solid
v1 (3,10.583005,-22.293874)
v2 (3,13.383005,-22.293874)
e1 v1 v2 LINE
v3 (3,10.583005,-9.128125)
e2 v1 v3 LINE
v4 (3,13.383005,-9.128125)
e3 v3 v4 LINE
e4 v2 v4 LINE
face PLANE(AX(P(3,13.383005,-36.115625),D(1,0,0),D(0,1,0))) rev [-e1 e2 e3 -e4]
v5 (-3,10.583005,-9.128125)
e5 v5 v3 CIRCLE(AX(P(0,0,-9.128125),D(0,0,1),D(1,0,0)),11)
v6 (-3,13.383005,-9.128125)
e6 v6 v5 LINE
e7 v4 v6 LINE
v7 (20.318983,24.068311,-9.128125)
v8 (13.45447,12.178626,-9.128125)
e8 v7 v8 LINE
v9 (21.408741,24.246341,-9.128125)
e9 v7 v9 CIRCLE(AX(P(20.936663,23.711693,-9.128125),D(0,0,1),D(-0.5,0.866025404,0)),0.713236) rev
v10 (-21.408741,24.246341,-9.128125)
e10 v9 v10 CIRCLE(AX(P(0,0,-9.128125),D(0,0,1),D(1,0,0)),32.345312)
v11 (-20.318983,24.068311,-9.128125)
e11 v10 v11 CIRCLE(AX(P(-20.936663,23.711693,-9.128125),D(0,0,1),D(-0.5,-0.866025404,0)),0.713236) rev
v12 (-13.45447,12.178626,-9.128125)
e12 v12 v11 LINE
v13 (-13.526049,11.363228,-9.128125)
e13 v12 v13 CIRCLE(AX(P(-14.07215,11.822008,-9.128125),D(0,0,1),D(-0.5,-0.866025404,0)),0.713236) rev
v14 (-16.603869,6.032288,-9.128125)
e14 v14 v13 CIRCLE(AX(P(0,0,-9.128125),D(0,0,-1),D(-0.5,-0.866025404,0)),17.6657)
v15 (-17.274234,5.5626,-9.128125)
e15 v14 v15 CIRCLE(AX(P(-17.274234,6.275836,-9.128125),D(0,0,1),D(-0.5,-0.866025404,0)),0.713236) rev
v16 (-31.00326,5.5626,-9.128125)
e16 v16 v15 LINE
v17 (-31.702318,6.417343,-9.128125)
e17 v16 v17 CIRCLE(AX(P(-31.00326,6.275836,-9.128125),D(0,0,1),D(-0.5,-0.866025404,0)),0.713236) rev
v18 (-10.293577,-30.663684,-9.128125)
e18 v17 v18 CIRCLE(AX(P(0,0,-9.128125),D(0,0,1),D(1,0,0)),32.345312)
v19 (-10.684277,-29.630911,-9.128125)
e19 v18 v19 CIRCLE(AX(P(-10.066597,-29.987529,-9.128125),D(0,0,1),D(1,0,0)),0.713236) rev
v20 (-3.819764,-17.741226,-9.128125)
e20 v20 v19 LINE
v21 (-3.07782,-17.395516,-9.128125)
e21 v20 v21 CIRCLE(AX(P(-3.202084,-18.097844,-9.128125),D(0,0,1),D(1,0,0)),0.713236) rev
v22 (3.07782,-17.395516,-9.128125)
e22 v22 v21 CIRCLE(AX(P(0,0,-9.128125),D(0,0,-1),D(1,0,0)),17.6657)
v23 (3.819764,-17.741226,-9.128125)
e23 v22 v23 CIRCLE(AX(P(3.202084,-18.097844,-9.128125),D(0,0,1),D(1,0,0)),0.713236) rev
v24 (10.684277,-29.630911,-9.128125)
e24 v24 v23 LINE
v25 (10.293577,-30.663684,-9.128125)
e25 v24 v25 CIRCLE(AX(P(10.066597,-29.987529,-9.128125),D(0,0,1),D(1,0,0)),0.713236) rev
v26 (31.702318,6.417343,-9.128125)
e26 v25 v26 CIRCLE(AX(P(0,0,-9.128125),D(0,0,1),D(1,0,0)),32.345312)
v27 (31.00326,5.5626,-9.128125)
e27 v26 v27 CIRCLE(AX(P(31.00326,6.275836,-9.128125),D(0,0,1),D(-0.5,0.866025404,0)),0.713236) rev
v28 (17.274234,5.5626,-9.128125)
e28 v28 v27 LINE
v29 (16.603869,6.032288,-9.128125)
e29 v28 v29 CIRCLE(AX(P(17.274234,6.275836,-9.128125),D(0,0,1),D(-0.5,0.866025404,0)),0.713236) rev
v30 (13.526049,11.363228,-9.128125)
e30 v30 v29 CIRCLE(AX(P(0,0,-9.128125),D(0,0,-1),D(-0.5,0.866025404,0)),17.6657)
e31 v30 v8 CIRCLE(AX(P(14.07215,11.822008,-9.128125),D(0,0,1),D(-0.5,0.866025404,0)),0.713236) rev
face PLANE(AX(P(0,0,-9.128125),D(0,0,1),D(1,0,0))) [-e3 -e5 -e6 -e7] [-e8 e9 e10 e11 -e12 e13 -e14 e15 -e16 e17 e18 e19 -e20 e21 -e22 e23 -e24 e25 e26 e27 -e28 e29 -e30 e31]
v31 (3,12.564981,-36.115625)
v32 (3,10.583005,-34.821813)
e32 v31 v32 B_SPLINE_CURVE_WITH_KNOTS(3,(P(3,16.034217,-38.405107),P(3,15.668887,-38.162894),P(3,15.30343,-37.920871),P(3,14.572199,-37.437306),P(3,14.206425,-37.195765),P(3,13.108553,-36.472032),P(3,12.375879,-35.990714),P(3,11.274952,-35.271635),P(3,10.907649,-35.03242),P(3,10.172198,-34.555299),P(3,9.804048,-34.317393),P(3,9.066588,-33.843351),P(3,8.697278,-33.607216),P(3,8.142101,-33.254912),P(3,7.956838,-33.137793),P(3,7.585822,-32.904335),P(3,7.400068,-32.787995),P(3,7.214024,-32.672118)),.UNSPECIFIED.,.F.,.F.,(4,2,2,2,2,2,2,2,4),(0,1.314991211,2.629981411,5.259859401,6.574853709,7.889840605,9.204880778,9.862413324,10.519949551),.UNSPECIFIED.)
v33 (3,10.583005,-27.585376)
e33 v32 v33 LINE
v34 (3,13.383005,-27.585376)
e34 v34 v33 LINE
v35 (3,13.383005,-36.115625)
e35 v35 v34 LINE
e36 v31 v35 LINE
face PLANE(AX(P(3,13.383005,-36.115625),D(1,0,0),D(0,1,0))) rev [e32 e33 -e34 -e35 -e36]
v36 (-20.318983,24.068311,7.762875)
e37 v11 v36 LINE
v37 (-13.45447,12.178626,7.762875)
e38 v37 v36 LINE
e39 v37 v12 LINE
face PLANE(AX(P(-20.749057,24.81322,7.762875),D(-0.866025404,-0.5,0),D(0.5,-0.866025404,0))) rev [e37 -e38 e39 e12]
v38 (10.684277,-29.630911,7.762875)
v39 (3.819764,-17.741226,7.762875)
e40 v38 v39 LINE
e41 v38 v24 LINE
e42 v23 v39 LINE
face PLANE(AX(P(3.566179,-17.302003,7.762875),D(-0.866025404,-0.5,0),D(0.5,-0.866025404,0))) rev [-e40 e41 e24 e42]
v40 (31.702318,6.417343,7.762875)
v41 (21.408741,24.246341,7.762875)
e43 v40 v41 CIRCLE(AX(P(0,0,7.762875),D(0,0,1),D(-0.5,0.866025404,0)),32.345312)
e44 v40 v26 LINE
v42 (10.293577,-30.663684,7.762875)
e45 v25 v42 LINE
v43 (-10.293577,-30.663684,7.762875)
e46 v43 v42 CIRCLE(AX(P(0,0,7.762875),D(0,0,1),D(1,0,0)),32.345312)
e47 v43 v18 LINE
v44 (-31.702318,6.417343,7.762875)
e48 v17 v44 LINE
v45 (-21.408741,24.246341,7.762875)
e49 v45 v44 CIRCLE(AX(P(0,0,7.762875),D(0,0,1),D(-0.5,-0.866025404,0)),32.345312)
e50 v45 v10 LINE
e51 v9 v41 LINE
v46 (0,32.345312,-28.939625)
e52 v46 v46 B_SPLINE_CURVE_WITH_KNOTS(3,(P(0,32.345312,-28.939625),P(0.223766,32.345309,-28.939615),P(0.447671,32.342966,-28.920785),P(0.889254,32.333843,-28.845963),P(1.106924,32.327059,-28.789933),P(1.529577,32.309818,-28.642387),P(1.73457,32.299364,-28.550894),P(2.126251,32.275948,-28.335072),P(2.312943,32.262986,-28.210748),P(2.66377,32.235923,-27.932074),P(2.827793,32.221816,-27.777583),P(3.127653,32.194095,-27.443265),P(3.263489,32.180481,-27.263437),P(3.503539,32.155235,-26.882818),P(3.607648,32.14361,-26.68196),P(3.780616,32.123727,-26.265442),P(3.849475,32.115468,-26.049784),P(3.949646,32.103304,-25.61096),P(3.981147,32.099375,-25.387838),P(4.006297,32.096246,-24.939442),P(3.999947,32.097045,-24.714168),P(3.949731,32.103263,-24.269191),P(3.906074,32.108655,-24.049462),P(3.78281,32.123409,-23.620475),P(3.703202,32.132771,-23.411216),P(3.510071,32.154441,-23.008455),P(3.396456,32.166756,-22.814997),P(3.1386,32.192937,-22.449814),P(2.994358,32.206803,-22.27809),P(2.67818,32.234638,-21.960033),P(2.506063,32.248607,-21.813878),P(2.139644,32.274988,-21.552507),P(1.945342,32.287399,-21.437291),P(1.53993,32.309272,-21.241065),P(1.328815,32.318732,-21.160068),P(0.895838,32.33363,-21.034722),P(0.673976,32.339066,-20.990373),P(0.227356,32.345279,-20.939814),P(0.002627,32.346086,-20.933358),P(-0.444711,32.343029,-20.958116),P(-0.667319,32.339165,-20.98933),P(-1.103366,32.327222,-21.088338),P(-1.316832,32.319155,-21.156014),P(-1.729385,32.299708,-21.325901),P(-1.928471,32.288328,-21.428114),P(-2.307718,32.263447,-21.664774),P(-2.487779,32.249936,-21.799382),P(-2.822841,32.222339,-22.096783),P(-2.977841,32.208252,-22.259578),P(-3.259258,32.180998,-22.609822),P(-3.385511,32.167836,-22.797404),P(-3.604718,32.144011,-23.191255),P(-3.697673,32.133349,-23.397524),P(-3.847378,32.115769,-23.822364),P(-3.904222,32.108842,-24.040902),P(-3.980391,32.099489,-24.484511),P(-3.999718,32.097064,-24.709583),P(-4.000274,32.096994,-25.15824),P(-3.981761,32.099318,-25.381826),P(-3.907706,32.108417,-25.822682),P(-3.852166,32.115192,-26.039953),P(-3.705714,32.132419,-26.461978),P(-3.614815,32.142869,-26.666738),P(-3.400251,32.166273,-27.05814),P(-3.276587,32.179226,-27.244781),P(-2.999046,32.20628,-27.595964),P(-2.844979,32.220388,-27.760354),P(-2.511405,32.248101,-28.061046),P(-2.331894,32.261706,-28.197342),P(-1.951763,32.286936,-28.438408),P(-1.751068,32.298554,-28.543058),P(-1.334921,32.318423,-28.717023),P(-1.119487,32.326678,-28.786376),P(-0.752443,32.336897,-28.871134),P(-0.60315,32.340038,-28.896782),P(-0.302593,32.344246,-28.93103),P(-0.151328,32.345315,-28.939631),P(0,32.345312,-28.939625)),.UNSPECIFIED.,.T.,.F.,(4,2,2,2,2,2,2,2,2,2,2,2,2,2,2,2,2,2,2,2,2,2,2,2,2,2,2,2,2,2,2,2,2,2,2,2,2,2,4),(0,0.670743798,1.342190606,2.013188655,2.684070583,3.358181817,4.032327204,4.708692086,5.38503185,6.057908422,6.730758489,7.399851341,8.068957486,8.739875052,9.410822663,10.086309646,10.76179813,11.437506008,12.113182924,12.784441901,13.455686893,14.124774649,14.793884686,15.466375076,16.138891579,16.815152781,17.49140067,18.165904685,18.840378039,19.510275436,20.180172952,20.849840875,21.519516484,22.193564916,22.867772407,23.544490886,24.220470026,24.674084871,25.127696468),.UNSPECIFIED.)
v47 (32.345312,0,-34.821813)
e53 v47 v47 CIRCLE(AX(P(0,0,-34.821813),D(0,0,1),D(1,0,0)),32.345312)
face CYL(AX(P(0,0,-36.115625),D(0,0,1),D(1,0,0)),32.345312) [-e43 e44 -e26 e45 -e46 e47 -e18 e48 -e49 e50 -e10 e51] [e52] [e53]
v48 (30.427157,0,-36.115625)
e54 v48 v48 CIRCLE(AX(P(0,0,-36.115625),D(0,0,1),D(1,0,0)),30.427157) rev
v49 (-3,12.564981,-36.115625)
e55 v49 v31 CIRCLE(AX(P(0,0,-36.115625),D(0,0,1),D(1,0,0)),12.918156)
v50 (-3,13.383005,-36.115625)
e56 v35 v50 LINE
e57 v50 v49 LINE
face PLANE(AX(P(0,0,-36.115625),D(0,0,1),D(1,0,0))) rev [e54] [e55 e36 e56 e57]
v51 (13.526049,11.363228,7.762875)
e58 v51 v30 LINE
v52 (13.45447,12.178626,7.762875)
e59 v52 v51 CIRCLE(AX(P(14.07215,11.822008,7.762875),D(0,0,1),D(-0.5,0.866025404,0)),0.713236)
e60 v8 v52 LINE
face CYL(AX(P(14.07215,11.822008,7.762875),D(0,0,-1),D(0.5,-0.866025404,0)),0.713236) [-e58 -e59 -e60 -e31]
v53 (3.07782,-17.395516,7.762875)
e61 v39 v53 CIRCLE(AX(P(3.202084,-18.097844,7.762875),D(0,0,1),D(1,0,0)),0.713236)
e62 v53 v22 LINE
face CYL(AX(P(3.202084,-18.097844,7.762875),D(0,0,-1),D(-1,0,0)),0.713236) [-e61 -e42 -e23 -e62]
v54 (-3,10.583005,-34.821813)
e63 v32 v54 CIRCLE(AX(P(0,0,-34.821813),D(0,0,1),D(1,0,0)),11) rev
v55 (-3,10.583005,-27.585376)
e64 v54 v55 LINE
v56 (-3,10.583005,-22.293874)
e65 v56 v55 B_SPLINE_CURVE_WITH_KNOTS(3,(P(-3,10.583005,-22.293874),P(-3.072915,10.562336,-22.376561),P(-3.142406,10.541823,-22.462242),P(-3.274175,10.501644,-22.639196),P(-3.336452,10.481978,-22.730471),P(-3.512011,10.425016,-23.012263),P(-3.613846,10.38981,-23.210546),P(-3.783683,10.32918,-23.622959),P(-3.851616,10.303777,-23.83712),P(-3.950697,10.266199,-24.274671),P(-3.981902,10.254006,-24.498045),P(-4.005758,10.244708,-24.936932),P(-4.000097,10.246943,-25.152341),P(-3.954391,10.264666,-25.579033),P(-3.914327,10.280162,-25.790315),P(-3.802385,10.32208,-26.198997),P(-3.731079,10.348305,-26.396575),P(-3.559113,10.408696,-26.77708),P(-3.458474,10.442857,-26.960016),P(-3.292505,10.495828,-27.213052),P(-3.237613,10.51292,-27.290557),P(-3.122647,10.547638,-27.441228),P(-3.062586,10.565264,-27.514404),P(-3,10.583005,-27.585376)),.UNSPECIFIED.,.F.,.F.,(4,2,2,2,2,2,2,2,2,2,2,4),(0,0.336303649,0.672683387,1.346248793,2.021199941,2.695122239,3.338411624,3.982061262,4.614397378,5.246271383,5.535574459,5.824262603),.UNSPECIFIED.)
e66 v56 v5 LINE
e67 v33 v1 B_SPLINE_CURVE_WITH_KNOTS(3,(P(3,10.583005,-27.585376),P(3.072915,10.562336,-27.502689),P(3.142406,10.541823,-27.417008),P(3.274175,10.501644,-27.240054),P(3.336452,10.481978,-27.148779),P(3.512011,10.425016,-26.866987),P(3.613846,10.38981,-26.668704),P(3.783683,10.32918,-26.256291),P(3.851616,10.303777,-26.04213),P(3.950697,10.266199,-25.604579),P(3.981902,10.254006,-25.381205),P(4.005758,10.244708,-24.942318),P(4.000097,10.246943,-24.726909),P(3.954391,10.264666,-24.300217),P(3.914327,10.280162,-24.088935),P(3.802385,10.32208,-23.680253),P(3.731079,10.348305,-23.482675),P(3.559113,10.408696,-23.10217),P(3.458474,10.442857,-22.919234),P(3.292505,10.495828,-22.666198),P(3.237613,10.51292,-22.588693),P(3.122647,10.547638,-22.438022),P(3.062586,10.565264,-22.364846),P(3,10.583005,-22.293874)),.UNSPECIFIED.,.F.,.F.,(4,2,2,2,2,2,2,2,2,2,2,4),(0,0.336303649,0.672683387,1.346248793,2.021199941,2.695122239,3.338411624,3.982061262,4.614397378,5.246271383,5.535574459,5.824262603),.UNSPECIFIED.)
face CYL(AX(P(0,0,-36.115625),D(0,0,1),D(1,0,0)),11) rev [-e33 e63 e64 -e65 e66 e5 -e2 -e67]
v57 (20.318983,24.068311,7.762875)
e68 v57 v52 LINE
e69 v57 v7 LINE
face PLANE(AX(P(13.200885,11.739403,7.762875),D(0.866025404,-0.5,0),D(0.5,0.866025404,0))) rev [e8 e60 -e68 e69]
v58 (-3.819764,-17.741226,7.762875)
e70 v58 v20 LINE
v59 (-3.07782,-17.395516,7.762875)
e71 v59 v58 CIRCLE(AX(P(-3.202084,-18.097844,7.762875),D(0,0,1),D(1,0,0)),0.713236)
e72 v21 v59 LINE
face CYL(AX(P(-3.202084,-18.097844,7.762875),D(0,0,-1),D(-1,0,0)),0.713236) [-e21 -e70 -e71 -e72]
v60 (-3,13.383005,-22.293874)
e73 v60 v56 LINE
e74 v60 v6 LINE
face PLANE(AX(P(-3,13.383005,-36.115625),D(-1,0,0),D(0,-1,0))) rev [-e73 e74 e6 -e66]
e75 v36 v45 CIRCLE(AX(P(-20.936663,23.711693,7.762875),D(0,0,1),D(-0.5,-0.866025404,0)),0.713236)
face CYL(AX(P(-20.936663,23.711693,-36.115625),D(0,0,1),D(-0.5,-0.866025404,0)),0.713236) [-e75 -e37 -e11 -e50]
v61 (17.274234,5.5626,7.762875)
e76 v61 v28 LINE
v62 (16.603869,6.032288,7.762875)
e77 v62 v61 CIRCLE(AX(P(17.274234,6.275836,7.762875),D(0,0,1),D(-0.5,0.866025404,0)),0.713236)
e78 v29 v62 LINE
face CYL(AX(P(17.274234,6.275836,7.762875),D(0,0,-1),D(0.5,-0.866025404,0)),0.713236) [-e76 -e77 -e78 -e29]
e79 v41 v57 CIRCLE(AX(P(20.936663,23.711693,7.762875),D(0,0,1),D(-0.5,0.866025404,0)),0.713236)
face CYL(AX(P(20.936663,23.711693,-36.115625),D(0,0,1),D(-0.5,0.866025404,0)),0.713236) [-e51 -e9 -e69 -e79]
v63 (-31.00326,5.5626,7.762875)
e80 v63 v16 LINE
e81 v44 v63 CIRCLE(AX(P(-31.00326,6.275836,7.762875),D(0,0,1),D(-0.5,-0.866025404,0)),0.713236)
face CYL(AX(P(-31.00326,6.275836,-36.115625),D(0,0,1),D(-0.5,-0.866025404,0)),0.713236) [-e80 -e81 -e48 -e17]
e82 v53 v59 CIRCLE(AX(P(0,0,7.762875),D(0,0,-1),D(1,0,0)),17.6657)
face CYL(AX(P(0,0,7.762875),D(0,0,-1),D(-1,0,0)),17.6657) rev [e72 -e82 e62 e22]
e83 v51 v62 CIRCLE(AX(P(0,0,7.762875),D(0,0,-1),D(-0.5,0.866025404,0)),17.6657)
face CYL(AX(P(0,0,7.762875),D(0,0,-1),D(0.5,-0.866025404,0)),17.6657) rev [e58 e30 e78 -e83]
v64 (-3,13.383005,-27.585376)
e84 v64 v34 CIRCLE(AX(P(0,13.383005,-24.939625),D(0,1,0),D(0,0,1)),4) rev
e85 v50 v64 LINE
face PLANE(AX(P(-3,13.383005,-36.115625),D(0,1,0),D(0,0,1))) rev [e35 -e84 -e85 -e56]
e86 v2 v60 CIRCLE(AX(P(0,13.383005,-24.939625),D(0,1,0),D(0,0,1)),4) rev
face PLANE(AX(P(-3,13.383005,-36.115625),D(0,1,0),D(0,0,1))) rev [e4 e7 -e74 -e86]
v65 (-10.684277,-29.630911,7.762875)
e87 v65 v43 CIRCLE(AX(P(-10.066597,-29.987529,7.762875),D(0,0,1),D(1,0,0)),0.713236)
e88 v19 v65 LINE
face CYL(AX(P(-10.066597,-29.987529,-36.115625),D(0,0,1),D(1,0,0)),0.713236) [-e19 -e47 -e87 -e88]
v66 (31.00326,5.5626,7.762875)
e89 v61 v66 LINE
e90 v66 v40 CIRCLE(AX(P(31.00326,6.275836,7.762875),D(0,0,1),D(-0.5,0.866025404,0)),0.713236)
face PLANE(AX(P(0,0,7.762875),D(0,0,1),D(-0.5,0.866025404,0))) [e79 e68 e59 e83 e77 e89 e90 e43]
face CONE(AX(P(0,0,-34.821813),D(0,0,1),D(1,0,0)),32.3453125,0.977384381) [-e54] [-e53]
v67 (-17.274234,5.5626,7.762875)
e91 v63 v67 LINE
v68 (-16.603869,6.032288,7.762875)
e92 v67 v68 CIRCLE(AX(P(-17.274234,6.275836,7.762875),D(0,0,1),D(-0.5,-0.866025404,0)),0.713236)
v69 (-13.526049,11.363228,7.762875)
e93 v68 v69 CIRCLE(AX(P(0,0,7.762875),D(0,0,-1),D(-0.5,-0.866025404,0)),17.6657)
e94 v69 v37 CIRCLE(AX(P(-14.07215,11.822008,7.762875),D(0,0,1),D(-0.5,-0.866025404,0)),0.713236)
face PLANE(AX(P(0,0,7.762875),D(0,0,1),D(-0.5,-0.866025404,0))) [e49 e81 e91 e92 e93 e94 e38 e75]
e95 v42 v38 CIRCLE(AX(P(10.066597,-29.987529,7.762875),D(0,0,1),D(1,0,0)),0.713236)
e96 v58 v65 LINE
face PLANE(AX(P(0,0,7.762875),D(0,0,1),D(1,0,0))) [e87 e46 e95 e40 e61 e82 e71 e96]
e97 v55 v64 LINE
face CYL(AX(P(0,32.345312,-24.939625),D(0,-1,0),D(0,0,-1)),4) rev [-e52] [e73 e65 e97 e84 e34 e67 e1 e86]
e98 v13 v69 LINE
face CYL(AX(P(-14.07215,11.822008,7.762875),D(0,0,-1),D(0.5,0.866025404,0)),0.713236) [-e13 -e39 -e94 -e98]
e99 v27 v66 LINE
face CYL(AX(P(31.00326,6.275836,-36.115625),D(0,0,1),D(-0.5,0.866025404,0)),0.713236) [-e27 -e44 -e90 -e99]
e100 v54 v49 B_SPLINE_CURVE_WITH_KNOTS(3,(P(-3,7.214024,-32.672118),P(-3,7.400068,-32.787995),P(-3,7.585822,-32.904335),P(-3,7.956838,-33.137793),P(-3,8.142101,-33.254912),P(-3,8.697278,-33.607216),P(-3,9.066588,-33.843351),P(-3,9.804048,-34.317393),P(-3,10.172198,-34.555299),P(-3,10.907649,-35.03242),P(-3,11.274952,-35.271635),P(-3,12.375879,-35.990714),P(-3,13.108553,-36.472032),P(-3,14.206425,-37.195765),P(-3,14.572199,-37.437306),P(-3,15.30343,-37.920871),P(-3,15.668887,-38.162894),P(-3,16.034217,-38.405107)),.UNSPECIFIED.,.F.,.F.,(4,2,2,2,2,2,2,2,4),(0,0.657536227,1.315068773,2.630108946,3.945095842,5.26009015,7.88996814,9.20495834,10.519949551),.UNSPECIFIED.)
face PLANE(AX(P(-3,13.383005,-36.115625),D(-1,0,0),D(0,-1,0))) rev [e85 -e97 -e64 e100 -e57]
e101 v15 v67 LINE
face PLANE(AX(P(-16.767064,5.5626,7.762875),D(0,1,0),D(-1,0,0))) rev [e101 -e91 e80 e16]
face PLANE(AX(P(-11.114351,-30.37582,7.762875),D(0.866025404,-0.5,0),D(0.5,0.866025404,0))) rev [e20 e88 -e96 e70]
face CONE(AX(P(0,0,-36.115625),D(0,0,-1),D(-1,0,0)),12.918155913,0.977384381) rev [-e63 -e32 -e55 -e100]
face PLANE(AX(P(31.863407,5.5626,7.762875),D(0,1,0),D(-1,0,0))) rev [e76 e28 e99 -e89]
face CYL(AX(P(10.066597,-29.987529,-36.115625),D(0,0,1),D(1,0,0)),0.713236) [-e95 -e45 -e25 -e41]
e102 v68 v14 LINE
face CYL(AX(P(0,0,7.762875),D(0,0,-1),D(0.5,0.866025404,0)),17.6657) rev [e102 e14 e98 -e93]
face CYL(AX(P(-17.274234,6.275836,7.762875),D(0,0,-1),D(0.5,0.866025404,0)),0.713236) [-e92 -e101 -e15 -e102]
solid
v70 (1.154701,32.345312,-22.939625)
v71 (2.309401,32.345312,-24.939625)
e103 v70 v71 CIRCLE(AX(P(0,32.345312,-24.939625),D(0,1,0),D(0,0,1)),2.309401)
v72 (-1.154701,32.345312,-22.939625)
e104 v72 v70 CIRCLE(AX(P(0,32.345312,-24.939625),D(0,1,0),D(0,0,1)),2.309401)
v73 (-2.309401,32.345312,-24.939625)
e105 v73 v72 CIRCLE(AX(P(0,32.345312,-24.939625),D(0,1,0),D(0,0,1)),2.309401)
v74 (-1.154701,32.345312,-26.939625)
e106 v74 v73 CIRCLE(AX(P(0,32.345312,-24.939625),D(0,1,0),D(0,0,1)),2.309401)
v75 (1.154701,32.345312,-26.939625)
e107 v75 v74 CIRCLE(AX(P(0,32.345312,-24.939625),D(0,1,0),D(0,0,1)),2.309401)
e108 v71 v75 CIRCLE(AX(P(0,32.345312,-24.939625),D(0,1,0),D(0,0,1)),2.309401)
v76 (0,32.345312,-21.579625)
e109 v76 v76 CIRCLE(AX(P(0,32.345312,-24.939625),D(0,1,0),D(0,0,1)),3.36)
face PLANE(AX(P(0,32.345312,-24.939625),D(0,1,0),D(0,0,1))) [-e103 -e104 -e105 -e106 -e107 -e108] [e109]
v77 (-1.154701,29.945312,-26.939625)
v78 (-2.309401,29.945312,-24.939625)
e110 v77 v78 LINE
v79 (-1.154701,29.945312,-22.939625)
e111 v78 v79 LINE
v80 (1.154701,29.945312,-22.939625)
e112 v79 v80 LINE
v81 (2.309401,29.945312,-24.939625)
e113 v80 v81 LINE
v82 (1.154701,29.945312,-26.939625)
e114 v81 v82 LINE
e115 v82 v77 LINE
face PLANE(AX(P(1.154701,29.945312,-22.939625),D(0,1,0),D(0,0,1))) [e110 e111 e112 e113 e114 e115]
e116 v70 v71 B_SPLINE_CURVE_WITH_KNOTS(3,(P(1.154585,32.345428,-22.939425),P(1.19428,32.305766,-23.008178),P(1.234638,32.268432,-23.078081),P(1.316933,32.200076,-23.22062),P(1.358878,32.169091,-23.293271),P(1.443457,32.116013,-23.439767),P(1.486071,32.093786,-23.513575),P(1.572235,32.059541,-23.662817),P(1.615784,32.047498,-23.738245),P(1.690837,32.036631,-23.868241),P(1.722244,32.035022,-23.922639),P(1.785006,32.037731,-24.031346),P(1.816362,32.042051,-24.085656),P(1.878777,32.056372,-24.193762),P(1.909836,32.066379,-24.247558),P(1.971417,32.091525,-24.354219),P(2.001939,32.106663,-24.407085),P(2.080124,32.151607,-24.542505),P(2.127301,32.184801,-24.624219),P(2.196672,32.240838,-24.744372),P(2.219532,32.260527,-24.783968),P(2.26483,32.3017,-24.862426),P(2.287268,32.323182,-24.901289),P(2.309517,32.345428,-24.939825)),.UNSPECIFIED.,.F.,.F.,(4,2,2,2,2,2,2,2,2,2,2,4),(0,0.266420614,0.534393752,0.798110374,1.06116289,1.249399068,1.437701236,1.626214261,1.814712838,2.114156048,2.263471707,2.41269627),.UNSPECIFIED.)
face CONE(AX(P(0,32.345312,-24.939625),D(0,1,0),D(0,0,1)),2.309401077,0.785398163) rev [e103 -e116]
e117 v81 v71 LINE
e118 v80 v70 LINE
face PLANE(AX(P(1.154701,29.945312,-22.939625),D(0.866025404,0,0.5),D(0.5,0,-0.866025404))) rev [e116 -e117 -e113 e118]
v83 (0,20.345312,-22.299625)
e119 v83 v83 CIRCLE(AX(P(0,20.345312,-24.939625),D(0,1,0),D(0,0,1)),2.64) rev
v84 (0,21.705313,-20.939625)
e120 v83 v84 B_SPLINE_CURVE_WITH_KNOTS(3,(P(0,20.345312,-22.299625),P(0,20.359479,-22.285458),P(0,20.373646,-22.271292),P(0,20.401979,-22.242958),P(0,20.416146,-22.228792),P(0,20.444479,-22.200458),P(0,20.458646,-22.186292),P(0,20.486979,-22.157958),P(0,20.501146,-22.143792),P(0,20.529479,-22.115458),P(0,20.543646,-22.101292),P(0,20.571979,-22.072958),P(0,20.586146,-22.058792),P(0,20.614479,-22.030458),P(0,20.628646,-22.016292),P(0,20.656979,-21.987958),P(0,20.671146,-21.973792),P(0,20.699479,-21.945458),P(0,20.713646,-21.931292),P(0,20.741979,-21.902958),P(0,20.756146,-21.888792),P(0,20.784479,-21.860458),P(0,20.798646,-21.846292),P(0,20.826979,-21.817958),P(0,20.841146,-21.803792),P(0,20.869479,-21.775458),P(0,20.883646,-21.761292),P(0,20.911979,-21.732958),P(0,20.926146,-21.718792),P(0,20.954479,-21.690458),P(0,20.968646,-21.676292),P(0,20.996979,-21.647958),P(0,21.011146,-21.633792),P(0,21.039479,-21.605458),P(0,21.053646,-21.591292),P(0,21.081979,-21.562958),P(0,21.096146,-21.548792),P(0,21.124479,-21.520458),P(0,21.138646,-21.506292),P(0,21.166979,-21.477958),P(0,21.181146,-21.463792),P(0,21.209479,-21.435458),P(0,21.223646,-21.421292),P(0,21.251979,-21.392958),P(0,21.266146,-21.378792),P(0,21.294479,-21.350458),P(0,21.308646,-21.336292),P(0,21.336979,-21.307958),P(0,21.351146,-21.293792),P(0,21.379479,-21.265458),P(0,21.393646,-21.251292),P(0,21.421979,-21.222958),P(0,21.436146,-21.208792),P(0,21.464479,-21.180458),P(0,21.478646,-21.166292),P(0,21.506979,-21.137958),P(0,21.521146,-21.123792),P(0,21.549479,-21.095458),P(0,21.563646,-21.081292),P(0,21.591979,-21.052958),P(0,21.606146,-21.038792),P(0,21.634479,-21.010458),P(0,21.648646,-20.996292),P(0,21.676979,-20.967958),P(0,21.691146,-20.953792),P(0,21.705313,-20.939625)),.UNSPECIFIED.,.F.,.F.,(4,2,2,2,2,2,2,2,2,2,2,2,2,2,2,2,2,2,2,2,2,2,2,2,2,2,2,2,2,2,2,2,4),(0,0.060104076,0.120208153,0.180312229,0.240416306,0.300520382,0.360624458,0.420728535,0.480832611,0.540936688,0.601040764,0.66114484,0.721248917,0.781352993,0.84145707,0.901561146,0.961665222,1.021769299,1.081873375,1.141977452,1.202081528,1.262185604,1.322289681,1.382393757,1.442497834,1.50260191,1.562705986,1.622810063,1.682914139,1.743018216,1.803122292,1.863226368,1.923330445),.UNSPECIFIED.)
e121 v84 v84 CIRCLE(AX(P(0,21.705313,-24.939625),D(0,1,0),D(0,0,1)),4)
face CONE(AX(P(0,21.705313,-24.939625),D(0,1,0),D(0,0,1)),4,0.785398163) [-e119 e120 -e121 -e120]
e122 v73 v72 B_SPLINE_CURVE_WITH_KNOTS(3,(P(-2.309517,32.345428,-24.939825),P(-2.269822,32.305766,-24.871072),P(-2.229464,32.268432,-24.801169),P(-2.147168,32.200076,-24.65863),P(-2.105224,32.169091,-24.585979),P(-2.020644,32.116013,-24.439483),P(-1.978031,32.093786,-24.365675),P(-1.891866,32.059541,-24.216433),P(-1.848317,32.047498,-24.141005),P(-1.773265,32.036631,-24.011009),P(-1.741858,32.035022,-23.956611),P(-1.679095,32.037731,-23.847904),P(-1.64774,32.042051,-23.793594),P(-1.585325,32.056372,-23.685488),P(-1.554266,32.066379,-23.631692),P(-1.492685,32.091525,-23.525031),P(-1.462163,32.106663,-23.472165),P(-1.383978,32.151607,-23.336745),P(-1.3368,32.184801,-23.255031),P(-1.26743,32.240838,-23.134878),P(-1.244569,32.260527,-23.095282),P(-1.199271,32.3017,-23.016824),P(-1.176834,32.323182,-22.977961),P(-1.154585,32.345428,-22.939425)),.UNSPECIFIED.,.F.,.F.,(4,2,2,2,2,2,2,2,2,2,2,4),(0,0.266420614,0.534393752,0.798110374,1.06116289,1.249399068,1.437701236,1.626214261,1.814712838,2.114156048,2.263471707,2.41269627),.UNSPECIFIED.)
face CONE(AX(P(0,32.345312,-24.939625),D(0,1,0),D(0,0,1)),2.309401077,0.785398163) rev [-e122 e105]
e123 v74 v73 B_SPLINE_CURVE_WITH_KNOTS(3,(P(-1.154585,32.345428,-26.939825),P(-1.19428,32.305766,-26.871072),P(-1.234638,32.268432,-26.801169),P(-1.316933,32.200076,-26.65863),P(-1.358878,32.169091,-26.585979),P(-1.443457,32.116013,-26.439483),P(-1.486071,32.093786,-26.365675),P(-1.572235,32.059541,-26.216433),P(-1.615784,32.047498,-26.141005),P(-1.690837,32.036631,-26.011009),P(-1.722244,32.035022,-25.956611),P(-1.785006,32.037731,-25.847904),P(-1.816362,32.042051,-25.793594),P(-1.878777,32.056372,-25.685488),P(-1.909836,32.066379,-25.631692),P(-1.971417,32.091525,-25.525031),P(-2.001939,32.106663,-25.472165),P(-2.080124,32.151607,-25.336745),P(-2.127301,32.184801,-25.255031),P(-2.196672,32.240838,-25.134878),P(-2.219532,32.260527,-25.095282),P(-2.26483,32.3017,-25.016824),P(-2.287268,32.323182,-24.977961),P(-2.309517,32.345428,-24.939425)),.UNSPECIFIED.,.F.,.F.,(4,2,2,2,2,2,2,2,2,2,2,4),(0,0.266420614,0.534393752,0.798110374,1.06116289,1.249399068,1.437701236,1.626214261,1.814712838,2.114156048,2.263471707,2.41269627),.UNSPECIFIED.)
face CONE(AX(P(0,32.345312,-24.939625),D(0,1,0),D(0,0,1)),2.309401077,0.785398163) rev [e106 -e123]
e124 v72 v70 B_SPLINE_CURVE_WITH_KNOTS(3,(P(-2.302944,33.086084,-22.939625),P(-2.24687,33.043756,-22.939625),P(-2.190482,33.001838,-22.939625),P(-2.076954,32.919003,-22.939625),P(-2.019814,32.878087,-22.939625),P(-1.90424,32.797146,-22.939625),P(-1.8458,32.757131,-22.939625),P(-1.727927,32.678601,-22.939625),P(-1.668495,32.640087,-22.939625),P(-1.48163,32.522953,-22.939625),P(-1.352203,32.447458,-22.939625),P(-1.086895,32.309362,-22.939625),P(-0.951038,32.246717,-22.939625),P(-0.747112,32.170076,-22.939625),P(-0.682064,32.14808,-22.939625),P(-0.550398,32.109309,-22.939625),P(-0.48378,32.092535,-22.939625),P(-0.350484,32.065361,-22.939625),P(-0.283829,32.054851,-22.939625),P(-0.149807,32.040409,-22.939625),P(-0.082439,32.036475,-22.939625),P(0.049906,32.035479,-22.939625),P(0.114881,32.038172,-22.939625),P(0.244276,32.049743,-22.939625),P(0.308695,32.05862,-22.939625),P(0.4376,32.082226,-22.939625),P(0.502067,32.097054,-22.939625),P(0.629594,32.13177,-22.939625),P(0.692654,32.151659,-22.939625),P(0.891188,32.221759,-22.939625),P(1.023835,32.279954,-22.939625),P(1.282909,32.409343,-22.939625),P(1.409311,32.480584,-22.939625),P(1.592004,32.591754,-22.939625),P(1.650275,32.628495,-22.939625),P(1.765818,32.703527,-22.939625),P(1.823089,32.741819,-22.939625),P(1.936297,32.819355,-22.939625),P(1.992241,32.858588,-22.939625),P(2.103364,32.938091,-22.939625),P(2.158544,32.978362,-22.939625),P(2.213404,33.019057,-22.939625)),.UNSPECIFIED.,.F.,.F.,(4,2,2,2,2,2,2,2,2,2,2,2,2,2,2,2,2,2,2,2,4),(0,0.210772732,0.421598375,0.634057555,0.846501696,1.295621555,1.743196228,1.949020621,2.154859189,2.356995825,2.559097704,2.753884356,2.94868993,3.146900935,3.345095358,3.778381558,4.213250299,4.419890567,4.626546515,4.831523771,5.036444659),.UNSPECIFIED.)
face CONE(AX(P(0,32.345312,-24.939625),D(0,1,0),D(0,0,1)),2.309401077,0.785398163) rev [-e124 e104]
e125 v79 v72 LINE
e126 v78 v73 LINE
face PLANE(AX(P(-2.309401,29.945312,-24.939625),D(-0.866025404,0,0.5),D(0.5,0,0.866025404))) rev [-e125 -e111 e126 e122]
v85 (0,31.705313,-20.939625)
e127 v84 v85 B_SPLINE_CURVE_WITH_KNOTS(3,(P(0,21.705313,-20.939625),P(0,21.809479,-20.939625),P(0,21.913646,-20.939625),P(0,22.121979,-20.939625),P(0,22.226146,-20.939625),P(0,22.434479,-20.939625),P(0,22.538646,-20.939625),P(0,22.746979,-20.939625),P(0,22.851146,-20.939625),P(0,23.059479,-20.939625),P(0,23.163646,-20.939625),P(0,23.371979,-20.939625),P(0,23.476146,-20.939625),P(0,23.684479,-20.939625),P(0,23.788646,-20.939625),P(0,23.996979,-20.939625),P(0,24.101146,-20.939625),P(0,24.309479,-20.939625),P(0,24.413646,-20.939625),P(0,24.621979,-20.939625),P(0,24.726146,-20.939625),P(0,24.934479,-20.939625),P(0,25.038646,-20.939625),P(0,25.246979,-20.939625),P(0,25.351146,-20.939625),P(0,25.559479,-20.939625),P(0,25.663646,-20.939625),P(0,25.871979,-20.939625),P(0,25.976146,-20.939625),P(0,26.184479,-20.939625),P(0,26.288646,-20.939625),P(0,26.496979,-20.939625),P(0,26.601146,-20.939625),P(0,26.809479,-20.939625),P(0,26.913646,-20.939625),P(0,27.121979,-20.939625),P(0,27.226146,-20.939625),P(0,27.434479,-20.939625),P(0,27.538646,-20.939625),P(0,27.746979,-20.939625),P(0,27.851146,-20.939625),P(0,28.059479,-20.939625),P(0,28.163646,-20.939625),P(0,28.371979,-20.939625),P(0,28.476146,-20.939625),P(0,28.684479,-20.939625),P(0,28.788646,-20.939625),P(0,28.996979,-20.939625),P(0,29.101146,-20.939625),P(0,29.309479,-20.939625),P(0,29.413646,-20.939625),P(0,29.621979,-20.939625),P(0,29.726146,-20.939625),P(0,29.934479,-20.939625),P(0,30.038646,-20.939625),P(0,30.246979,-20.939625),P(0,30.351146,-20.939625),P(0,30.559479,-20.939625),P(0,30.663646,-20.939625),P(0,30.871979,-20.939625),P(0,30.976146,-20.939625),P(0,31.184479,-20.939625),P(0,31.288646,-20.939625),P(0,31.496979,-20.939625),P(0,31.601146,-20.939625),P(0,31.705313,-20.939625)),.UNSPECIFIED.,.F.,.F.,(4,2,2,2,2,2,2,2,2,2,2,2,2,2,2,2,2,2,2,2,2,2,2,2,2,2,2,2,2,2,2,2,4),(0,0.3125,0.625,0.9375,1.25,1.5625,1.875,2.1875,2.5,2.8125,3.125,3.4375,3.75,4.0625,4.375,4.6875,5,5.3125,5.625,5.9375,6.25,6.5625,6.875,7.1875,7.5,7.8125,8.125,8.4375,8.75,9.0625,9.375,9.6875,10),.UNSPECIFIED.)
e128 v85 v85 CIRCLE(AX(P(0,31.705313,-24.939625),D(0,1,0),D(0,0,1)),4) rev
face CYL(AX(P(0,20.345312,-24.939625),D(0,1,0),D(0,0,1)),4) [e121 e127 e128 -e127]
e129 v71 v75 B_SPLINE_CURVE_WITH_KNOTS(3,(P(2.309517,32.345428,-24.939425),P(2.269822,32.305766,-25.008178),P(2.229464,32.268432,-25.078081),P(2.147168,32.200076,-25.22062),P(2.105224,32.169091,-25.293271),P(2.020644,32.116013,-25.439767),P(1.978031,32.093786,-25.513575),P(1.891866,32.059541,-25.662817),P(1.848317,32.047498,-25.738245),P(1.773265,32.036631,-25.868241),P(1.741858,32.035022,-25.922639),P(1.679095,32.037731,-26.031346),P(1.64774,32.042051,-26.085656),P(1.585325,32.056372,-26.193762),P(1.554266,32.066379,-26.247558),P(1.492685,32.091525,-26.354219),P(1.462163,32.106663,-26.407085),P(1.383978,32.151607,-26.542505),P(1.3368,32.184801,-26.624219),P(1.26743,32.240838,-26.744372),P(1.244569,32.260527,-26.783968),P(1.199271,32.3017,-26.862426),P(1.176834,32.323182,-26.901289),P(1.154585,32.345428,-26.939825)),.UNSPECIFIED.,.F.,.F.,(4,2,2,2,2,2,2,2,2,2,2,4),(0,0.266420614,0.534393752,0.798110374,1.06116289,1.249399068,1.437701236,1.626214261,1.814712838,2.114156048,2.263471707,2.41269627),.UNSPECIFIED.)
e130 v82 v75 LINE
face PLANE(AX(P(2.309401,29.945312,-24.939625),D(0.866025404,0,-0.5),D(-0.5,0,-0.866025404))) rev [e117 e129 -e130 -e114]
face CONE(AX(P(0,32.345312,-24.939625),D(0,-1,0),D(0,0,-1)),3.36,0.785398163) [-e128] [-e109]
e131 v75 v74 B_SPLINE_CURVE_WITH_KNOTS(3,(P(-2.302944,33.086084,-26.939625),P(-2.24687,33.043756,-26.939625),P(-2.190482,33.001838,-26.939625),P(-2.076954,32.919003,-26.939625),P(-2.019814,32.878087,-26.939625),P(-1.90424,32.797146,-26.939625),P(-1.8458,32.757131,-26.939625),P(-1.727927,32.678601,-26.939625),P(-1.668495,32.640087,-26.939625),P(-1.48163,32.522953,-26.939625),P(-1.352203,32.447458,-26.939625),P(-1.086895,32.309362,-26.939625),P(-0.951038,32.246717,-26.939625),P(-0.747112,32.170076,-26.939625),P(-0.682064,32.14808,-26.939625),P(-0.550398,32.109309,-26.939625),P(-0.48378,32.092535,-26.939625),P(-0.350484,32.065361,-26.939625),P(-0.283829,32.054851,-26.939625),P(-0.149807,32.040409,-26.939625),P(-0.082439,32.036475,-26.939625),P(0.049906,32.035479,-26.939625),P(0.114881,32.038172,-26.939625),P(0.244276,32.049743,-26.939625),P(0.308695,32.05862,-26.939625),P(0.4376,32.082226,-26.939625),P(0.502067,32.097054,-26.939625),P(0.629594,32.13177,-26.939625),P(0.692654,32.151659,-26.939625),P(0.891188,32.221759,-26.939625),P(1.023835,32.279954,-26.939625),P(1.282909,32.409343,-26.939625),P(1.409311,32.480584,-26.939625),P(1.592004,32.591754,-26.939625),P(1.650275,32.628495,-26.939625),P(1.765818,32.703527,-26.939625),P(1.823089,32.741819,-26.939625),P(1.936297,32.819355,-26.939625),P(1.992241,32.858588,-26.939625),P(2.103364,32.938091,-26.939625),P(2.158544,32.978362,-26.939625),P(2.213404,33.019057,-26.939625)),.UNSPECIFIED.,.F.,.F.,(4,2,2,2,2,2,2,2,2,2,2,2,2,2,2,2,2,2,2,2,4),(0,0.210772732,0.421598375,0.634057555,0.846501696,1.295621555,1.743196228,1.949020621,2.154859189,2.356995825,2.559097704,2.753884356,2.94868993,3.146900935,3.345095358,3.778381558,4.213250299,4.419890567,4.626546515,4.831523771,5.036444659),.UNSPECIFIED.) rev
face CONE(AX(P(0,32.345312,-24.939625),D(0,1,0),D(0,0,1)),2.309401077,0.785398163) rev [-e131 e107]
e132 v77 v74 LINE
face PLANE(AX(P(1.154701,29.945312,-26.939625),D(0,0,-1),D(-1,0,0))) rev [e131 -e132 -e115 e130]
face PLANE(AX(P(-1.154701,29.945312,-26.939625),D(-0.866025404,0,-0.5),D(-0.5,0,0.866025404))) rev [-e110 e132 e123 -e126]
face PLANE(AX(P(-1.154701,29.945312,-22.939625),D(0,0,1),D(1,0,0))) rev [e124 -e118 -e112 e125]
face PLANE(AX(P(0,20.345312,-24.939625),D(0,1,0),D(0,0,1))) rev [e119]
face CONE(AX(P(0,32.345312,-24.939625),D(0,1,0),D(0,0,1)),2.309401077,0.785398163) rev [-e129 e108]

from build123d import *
from OCP.BRepFilletAPI import BRepFilletAPI_MakeChamfer

# Parameters (mm, degrees)
BOSS_EXTRUDE1_START      = -9.128125
SKETCH1_R                = 32.3453125
BOSS_EXTRUDE1_DEPTH      = 26.9875
BOSS_EXTRUDE2_DEPTH      = 16.891
FILLET1_R                = 0.713235825
CIRPATTERN1_COUNT        = 3
FILLET1_OF_CIRPATTERN1_R = 0.713235825
CUT_EXTRUDE5_DEPTH       = 59.281874117
CUT_EXTRUDE5_DEPTH_BACK  = 59.281874117
SKETCH15_R               = 11
CHAMFER1_SIZE            = 1.2938125
CHAMFER1_SIZE2           = 1.918155913
CUT_EXTRUDE1_DEPTH       = 59.281874117
CUT_EXTRUDE1_DEPTH_BACK  = 59.281874117
SKETCH5_R                = 4
CUT_EXTRUDE2_DEPTH       = 59.281874117
SKETCH6_R                = 4
BOSS_EXTRUDE3_DEPTH      = 12
CUT_EXTRUDE3_DEPTH       = 2.4
CHAMFER3_SIZE            = 0.64
CHAMFER4_SIZE            = 1.36


with BuildPart() as part:
    # Sketch1 → Boss-Extrude1 (new body)
    with BuildSketch(Plane.XY.offset(BOSS_EXTRUDE1_START)):
        Circle(SKETCH1_R)
    extrude(amount=-BOSS_EXTRUDE1_DEPTH)

    # Sketch2 → Boss-Extrude2 (add)
    with BuildSketch(Plane.XY.offset(-9.128125)):
        with BuildLine():
            Line((-11.114350717, -30.375820135), (-3.566179127, -17.302003437))
            ThreePointArc((-3.566179127, -17.302003437), (0, -17.6657), (3.566179127, -17.302003437))
            Line((3.566179127, -17.302003437), (11.114350717, -30.375820135))
            ThreePointArc((11.114350717, -30.375820135), (0, -32.3453125), (-11.114350717, -30.375820135))
        make_face()
    boss_extrude2 = extrude(amount=BOSS_EXTRUDE2_DEPTH)

    # Fillet1
    # the kernel refuses this fillet: 0.713235825 mm, written as the material it takes off along each edge
    with BuildSketch(Plane(origin=(-11.114350717, -30.375820135, -9.128125), x_dir=(0.9436455754007305, -0.3309577435664929, 0), z_dir=(0, 0, 1))) as fillet1_piece_1:
        with BuildLine():
            CenterArc((0.860200247, 0.713171354), FILLET1_R, 169.326916929, 101.443469756)
            Line((0.159303464, 0.845266176), (0, 0))
            ThreePointArc((0, 0), (0.434894987, -0.002923796), (0.869789973, 0))
        make_face()
    extrude(amount=19.065474933, mode=Mode.SUBTRACT)
    with BuildSketch(Plane(origin=(11.114350717, -30.375820135, -9.128125), x_dir=(-0.9436455754007282, -0.3309577435664989, 0), z_dir=(0, 0, 1))) as fillet1_piece_2:
        with BuildLine():
            CenterArc((0.860200247, -0.713171354), FILLET1_R, 89.229613314, 101.443469756)
            Line((0.159303464, -0.845266176), (0, 0))
            ThreePointArc((0, 0), (0.434894987, 0.002923796), (0.869789973, 0))
        make_face()
    extrude(amount=19.065474933, mode=Mode.SUBTRACT)
    with BuildSketch(Plane(origin=(3.566179127, -17.302003437, -9.128125), x_dir=(0.500000000000002, -0.8660254037844376, 0), z_dir=(0, 0, 1))) as fillet1_piece_3:
        with BuildLine():
            CenterArc((0.507170112, -0.713235825), FILLET1_R, 90, 70.033604576)
            ThreePointArc((-0.163195289, -0.469687941), (-0.07994504, -0.235418176), (0, 0))
            Line((0, 0), (0.507170112, 0))
        make_face()
    extrude(amount=18.158925279, mode=Mode.SUBTRACT)
    with BuildSketch(Plane(origin=(-3.566179127, -17.302003437, -9.128125), x_dir=(0.9821562739684868, -0.18806661985673784, 0), z_dir=(0, 0, 1))) as fillet1_piece_4:
        with BuildLine():
            CenterArc((0.507269431, -0.71316519), FILLET1_R, 90.806371221, 70.033604577)
            Line((-0.166457119, -0.479075724), (0, 0))
            ThreePointArc((0, 0), (0.248615901, -0.001749518), (0.497231801, 0))
        make_face()
    extrude(amount=18.158925279, mode=Mode.SUBTRACT)

    # CirPattern1: Boss-Extrude2 ×3 about axis
    cirpattern1_axis = Axis((0, 0, 0), (0, 0, 1))
    for i in range(1, CIRPATTERN1_COUNT):
        add(boss_extrude2.rotate(cirpattern1_axis, i * 360 / CIRPATTERN1_COUNT))

    # Fillet1 of CirPattern1
    # the kernel refuses this fillet: 0.713235825 mm, written as the material it takes off along each edge
    with BuildSketch(Plane(origin=(31.863407256, 5.5626, -9.128125), x_dir=(-0.18520497419260348, 0.9826999122490635, 0), z_dir=(0, 0, 1)), Plane(origin=(-20.749056539, 24.813220135, -9.128125), x_dir=(-0.7584406012081224, -0.6517421686825718, 0), z_dir=(0, 0, 1))) as fillet1_of_cirpattern1_piece_1:
        with BuildLine():
            CenterArc((0.860200247, 0.713171354), FILLET1_OF_CIRPATTERN1_R, 169.326916929, 101.443469756)
            Line((0.159303464, 0.845266176), (0, 0))
            ThreePointArc((0, 0), (0.434894987, -0.002923796), (0.869789973, 0))
        make_face()
    extrude(amount=19.065474933, mode=Mode.SUBTRACT)
    with BuildSketch(Plane(origin=(20.749056539, 24.813220135, -9.128125), x_dir=(0.7584406012081266, -0.6517421686825667, 0), z_dir=(0, 0, 1)), Plane(origin=(-31.863407256, 5.5626, -9.128125), x_dir=(0.18520497419260348, 0.9826999122490635, 0), z_dir=(0, 0, 1))) as fillet1_of_cirpattern1_piece_2:
        with BuildLine():
            CenterArc((0.860200247, -0.713171354), FILLET1_OF_CIRPATTERN1_R, 89.229613314, 101.443469756)
            Line((0.159303464, -0.845266176), (0, 0))
            ThreePointArc((0, 0), (0.434894987, 0.002923796), (0.869789973, 0))
        make_face()
    extrude(amount=19.065474933, mode=Mode.SUBTRACT)
    with BuildSketch(Plane(origin=(13.200884949, 11.739403437, -9.128125), x_dir=(0.49999999999999967, 0.8660254037844388, 0), z_dir=(0, 0, 1)), Plane(origin=(-16.767064076, 5.5626, -9.128125), x_dir=(-1, 0, 0), z_dir=(0, 0, 1))) as fillet1_of_cirpattern1_piece_3:
        with BuildLine():
            CenterArc((0.507170112, -0.713235825), FILLET1_OF_CIRPATTERN1_R, 90, 70.033604576)
            ThreePointArc((-0.163195289, -0.469687941), (-0.07994504, -0.235418176), (0, 0))
            Line((0, 0), (0.507170112, 0))
        make_face()
    extrude(amount=18.158925279, mode=Mode.SUBTRACT)
    with BuildSketch(Plane(origin=(16.767064076, 5.5626, -9.128125), x_dir=(-0.3282076665844337, 0.9446055936713488, 0), z_dir=(0, 0, 1)), Plane(origin=(-13.200884949, 11.739403437, -9.128125), x_dir=(-0.6539486073840537, -0.7565389738146059, 0), z_dir=(0, 0, 1))) as fillet1_of_cirpattern1_piece_4:
        with BuildLine():
            CenterArc((0.507269431, -0.71316519), FILLET1_OF_CIRPATTERN1_R, 90.806371221, 70.033604577)
            Line((-0.166457119, -0.479075724), (0, 0))
            ThreePointArc((0, 0), (0.248615901, -0.001749518), (0.497231801, 0))
        make_face()
    extrude(amount=18.158925279, mode=Mode.SUBTRACT)

    # Sketch15 → Cut-Extrude5 (cut, two sides: drawn at the far end of the back side and taken through both)
    with BuildSketch(Plane.XY.offset(-CUT_EXTRUDE5_DEPTH_BACK)):
        Circle(SKETCH15_R)
    extrude(amount=CUT_EXTRUDE5_DEPTH + CUT_EXTRUDE5_DEPTH_BACK, mode=Mode.SUBTRACT)

    # Chamfer1: one chamfer whose edges measure the first distance from different faces: ONE call of the kernel's chamfer builder (chamfer() names one face for all edges)
    chamfer1_edges_1 = [part.edges().sort_by_distance(p)[0] for p in [
        (-32.3453125, 0, -36.115625),
    ]]
    chamfer1_side_1 = [part.faces().sort_by_distance(p)[0] for p in [
        (-32.3453125, 0, -22.621875),
    ]]
    chamfer1_edges_2 = [part.edges().sort_by_distance(p)[0] for p in [
        (-11, 0, -36.115625),
    ]]
    chamfer1_side_2 = [part.faces().sort_by_distance(p)[0] for p in [
        (-11, 0, -22.621875),
    ]]
    chamfer1 = BRepFilletAPI_MakeChamfer(part.part.solid().wrapped)
    for e in chamfer1_edges_1:
        chamfer1.Add(CHAMFER1_SIZE, CHAMFER1_SIZE2, e.wrapped, chamfer1_side_1[0].wrapped)  # the first distance lies on this face
    for e in chamfer1_edges_2:
        chamfer1.Add(CHAMFER1_SIZE, CHAMFER1_SIZE2, e.wrapped, chamfer1_side_2[0].wrapped)  # the first distance lies on this face
    add(Compound.cast(chamfer1.Shape()), mode=Mode.REPLACE)

    # Sketch4 → Cut-Extrude1 (cut, two sides: drawn at the far end of the back side and taken through both)
    with BuildSketch(Plane.XY.offset(-CUT_EXTRUDE1_DEPTH_BACK)):
        with BuildLine():
            Line((-3, 13.383005244), (3, 13.383005244))
            Line((3, 13.383005244), (3, 10.583005244))
            ThreePointArc((3, 10.583005244), (0, 11), (-3, 10.583005244))
            Line((-3, 10.583005244), (-3, 13.383005244))
        make_face()
    extrude(amount=CUT_EXTRUDE1_DEPTH + CUT_EXTRUDE1_DEPTH_BACK, mode=Mode.SUBTRACT)

    # Sketch5 → Cut-Extrude2 (cut, through all)
    with BuildSketch(Plane(origin=(0, 0, 0), x_dir=(1, 0, 0), z_dir=(0, 1, 0))):
        with Locations(Location((0, 24.939625, 0), (0, 0, 90))):
            Circle(SKETCH5_R)
    extrude(amount=CUT_EXTRUDE2_DEPTH, mode=Mode.SUBTRACT)


with BuildPart() as body_2:
    # Sketch6 → Boss-Extrude3 (new body)
    with BuildSketch(Plane(origin=(0, 32.3453125, 0), x_dir=(-1, 0, 0), z_dir=(0, 1, 0))):
        with Locations(Location((0, -24.939625, 0), (0, 0, 90))):
            Circle(SKETCH6_R)
    extrude(amount=-BOSS_EXTRUDE3_DEPTH)

    # Sketch8 → Cut-Extrude3 (cut)
    with BuildSketch(Plane(origin=(0, 32.3453125, 0), x_dir=(1, 0, 0), z_dir=(0, 1, 0))):
        Polygon((1.154700538, 22.939625), (2.309401077, 24.939625), (1.154700538, 26.939625), (-1.154700538, 26.939625), (-2.309401077, 24.939625), (-1.154700538, 22.939625), align=None)
    extrude(amount=-CUT_EXTRUDE3_DEPTH, mode=Mode.SUBTRACT)

    # Cut-Extrude4 cone 1 section (through the dimple's axis) → Cut-Extrude4 (revolve, cut)
    with BuildSketch(Plane(origin=(0, 32.3453125, -24.939625), x_dir=(0, 0, 1), z_dir=(1, 0, 0))):
        Polygon((0, 0), (2.309401077, 0), (0, 2.309401077), align=None)
    revolve(axis=Axis((0, 32.3453125, -24.939625), (0, -1, 0)), mode=Mode.SUBTRACT)

    # Chamfer3
    chamfer3_edges = [body_2.edges().sort_by_distance(p)[0] for p in [
        (0, 32.3453125, -28.939625),
    ]]
    chamfer(chamfer3_edges, length=CHAMFER3_SIZE)

    # Chamfer4
    chamfer4_edges = [body_2.edges().sort_by_distance(p)[0] for p in [
        (0, 20.3453125, -28.939625),
    ]]
    chamfer(chamfer4_edges, length=CHAMFER4_SIZE)


solid = Compound([part.part, body_2.part])
